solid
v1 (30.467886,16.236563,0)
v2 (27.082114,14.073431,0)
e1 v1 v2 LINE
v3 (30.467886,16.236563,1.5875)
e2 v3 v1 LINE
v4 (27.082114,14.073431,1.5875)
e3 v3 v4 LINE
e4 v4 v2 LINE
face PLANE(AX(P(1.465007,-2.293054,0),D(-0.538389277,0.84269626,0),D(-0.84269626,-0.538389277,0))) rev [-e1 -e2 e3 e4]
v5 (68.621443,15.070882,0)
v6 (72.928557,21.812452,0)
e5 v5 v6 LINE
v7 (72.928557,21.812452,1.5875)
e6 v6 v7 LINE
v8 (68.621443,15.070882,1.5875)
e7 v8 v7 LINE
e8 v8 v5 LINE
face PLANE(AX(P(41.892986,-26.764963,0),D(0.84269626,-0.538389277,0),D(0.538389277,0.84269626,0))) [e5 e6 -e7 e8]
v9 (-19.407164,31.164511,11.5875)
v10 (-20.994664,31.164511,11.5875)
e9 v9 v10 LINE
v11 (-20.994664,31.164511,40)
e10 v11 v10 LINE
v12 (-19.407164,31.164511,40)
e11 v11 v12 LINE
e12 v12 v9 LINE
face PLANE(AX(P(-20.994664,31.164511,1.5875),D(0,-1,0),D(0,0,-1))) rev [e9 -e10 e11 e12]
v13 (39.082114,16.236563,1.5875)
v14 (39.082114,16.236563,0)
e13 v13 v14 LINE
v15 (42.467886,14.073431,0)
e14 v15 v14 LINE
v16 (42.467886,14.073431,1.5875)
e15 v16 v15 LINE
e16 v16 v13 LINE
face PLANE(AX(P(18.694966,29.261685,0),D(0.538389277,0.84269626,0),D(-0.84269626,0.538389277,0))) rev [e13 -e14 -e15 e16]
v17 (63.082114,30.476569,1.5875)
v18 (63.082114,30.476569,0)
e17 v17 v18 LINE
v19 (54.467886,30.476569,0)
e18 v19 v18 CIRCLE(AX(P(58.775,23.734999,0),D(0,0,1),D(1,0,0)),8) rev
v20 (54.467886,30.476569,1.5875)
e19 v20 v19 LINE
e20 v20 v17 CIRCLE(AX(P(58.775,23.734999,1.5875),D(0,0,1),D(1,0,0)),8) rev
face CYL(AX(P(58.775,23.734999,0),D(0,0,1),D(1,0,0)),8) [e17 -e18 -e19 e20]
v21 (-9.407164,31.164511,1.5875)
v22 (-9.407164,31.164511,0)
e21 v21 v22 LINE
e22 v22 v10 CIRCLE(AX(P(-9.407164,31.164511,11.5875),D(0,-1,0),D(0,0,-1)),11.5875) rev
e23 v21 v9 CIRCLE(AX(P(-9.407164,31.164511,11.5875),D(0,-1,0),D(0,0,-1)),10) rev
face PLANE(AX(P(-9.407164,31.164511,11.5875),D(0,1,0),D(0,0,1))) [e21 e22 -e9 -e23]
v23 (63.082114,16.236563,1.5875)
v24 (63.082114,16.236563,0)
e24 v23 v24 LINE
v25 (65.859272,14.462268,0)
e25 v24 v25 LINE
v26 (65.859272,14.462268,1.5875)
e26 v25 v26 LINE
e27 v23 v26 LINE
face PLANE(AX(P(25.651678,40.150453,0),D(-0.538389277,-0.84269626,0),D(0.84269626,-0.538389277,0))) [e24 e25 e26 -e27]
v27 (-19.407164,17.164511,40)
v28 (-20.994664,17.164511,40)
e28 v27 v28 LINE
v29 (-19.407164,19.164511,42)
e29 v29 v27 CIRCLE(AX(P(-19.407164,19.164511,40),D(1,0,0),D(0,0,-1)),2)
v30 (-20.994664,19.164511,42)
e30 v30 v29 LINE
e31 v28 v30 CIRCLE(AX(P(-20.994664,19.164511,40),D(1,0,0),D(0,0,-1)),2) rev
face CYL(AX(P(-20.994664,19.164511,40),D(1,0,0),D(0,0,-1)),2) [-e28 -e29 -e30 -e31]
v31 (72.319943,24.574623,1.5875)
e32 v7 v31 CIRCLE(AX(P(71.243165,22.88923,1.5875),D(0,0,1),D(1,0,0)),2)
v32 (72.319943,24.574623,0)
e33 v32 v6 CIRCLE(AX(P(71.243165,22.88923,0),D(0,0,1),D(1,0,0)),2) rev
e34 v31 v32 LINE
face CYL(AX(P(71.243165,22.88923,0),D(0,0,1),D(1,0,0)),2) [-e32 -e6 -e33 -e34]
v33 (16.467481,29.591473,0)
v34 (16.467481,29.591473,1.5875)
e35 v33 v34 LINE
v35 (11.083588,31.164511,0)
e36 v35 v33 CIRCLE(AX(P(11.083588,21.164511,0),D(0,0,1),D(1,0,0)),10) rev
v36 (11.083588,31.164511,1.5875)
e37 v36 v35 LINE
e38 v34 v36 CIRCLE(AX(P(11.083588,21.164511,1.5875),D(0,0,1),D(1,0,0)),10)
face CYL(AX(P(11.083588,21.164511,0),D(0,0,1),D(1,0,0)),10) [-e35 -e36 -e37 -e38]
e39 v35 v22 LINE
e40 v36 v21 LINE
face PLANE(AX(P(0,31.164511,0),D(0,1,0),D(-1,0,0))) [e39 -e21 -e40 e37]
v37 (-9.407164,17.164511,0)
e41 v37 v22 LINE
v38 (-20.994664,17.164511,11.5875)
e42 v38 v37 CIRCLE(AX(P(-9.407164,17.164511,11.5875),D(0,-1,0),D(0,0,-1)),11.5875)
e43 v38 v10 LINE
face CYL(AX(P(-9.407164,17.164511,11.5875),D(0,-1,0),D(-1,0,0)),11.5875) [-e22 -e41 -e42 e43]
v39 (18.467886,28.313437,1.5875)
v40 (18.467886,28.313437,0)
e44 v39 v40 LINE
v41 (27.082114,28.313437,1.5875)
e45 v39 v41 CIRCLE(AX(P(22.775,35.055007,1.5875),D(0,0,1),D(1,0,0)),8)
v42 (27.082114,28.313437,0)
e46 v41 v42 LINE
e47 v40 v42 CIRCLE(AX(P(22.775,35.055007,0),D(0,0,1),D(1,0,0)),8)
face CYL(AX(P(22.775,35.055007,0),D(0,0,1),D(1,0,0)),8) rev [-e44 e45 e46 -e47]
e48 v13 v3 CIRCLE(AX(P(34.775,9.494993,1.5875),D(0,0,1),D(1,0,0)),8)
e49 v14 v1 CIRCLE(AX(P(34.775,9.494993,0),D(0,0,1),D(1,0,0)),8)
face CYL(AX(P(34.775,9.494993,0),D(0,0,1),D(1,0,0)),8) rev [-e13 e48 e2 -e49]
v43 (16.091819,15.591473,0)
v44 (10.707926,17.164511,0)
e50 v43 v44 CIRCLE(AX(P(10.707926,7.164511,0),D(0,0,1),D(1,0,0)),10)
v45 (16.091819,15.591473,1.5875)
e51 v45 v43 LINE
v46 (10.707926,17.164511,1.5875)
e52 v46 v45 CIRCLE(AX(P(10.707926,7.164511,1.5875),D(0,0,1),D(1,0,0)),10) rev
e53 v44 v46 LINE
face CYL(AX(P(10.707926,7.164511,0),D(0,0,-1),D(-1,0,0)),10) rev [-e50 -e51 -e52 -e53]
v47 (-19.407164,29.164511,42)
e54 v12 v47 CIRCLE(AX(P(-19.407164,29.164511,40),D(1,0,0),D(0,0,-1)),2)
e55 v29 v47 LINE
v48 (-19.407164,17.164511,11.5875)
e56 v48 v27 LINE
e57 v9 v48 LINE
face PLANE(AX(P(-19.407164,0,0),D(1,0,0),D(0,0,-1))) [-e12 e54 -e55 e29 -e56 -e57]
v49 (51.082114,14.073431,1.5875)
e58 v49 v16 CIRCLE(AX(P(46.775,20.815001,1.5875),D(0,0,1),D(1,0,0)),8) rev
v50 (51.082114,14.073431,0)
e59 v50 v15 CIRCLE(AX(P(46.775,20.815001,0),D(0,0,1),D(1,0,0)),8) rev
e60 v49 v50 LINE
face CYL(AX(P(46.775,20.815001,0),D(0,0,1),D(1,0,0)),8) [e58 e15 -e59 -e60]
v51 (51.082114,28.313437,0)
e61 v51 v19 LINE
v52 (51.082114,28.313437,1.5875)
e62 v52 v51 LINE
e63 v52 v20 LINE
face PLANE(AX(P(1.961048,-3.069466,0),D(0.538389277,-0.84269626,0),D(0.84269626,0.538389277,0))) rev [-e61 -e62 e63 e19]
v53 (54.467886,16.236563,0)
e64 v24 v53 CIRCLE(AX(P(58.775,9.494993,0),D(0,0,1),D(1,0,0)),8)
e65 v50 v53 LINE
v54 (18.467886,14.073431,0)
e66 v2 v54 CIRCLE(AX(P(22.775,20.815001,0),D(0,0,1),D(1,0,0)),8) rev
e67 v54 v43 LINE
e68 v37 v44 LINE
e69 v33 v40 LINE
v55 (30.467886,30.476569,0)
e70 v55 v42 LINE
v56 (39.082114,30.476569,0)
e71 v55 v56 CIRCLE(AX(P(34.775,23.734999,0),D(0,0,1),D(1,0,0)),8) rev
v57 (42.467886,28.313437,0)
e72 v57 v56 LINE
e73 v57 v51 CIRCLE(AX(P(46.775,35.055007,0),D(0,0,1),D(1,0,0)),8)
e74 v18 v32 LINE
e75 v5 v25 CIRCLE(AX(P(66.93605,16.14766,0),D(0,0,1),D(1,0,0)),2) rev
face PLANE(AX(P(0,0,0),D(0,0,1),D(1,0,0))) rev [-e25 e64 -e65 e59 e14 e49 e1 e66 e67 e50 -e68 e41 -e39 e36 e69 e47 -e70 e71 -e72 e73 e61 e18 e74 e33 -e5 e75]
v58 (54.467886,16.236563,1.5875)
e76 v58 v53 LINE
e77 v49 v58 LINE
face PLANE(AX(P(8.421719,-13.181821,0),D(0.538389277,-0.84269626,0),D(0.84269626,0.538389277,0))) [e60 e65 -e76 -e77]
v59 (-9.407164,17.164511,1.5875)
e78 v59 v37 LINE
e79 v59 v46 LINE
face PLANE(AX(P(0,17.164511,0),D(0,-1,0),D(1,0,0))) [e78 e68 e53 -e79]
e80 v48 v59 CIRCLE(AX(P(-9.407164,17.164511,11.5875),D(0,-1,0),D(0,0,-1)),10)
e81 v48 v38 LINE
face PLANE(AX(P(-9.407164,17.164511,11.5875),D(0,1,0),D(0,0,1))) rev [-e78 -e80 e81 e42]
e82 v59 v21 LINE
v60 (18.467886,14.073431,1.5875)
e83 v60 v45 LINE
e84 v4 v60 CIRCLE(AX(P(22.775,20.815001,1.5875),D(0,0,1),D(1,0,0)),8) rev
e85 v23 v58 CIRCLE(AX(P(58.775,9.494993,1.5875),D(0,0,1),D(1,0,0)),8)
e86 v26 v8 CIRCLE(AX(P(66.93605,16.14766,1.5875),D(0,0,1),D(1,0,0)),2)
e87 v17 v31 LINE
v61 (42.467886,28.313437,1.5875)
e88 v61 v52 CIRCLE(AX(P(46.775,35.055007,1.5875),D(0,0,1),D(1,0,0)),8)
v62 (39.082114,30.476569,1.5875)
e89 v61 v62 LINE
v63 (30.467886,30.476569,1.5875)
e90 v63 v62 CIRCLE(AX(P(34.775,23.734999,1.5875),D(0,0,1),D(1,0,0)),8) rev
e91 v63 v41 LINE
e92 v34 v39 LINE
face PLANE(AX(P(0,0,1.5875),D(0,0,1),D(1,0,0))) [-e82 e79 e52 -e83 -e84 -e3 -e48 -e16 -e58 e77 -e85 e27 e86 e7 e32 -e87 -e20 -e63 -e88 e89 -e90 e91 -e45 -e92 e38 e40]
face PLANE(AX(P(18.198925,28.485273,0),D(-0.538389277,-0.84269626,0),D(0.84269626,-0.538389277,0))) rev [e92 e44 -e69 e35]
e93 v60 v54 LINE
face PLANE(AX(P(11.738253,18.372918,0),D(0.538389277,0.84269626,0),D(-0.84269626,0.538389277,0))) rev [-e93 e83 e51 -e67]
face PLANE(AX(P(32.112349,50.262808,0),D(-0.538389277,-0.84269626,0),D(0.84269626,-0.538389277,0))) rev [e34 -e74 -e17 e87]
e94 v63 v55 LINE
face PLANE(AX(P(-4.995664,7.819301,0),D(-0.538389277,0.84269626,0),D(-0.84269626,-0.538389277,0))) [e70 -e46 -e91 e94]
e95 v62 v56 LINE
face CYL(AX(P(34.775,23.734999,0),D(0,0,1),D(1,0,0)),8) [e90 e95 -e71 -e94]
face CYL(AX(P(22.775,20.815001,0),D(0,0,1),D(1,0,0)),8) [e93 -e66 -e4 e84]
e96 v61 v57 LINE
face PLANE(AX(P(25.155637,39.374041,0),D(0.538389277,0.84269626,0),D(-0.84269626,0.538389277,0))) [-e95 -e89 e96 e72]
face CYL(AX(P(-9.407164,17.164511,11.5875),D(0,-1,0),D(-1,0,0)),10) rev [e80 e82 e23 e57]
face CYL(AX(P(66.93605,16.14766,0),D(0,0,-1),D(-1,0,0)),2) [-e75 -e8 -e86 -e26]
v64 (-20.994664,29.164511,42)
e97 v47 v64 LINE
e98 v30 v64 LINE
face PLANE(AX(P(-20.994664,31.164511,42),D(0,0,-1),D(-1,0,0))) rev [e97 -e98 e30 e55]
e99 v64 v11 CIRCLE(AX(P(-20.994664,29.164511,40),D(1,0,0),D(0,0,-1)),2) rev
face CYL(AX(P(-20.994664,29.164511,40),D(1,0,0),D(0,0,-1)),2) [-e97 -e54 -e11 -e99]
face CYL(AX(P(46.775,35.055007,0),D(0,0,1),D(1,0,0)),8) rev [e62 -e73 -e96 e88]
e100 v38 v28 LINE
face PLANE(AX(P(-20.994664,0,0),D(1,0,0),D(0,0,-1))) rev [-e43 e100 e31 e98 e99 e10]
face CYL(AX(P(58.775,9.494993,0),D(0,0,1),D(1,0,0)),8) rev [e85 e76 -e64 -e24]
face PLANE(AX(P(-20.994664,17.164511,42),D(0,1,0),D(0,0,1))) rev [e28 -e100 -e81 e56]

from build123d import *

# Parameters (mm, degrees)
BOSS_EXTRUDE1_DEPTH          = 1.5875
FILLET3_R                    = 8
FILLET4_R                    = 8
BOSS_EXTRUDE3_DEPTH          = 1.5875
EDGE_FLANGE1_STRIP_W         = 26.35
EDGE_FLANGE1_STRIP_H         = 1.5875
EDGE_FLANGE1_STRIP_CUT_DEPTH = 14
EDGE_FLANGE1_DEPTH           = 14
FILLET5_R                    = 10
FILLET9_R                    = 2


# Sheet-metal steps are written as plain solids
with BuildPart() as part:
    # Sketch3 → Boss-Extrude1 (new body)
    with BuildSketch(Plane.XY):
        Polygon((58.775, 33.228336454), (53.202823644, 29.668334894), (46.775, 25.561669788), (40.347176356, 29.668334894), (34.775, 33.228336454), (22.775, 25.561669788), (14.005335663, 31.164510892), (7.544664337, 21.052155774), (22.775, 11.321663546), (28.347176356, 14.881665106), (34.775, 18.988330212), (41.202823644, 14.881665106), (46.775, 11.321663546), (58.775, 18.988330212), (67.544664337, 13.385489108), (74.005335663, 23.497844226), align=None)
    extrude(amount=BOSS_EXTRUDE1_DEPTH)

    # Fillet3
    fillet3_edges = [part.edges().sort_by_distance(p)[0] for p in [
        (46.775, 11.321663546, 0.79375),
        (22.775, 11.321663546, 0.79375),
        (34.775, 33.228336454, 0.79375),
        (58.775, 33.228336454, 0.79375),
    ]]
    fillet(fillet3_edges, radius=FILLET3_R)

    # Fillet4
    fillet4_edges = [part.edges().sort_by_distance(p)[0] for p in [
        (34.775, 18.988330212, 0.79375),
        (22.775, 25.561669788, 0.79375),
        (46.775, 25.561669788, 0.79375),
        (58.775, 18.988330212, 0.79375),
    ]]
    fillet(fillet4_edges, radius=FILLET4_R)

    # Sketch5 → Boss-Extrude3 (add)
    with BuildSketch(Plane(origin=(0, 0, 0), x_dir=(-1, 0, 0), z_dir=(0, 0, -1))):
        Polygon((20.994664337, 31.164510892), (-14.005335663, 31.164510892), (-7.544664337, 21.052155774), (-13.629673718, 17.164510892), (20.994664337, 17.164510892), align=None)
    extrude(amount=-BOSS_EXTRUDE3_DEPTH)

    # Edge-Flange1 strip (across the edge) → Edge-Flange1 strip cut (cut)
    with BuildSketch(Plane(origin=(-20.994664337, 31.164510892, 1.5875), x_dir=(1, 0, 0), z_dir=(0, -1, 0))):
        with Locations((-1.5875, -0.79375)):
            Rectangle(EDGE_FLANGE1_STRIP_W, EDGE_FLANGE1_STRIP_H)
    extrude(amount=EDGE_FLANGE1_STRIP_CUT_DEPTH, mode=Mode.SUBTRACT)

    # Edge-Flange1 section (across the edge) → Edge-Flange1 (add)
    with BuildSketch(Plane(origin=(-20.994664337, 31.164510892, 1.5875), x_dir=(1, 0, 0), z_dir=(0, -1, 0))):
        with BuildLine():
            Line((0, 10), (0, 40.4125))
            Line((0, 40.4125), (1.5875, 40.4125))
            Line((1.5875, 40.4125), (1.5875, 10))
            ThreePointArc((1.5875, 10), (4.516432188, 2.928932188), (11.5875, 0))
            Line((11.5875, 0), (11.5875, -1.5875))
            ThreePointArc((11.5875, -1.5875), (3.393900173, 1.806400173), (0, 10))
        make_face()
    extrude(amount=EDGE_FLANGE1_DEPTH)

    # Fillet5
    fillet5_edges = [part.edges().sort_by_distance(p)[0] for p in [
        (14.005335663, 31.164510892, 0.79375),
        (13.629673718, 17.164510892, 0.79375),
    ]]
    fillet(fillet5_edges, radius=FILLET5_R)

    # Fillet9
    fillet9_edges = [part.edges().sort_by_distance(p)[0] for p in [
        (67.544664337, 13.385489108, 0.79375),
        (74.005335663, 23.497844226, 0.79375),
        (-20.200914337, 31.164510892, 42),
        (-20.200914337, 17.164510892, 42),
    ]]
    fillet(fillet9_edges, radius=FILLET9_R)


solid = part.part
